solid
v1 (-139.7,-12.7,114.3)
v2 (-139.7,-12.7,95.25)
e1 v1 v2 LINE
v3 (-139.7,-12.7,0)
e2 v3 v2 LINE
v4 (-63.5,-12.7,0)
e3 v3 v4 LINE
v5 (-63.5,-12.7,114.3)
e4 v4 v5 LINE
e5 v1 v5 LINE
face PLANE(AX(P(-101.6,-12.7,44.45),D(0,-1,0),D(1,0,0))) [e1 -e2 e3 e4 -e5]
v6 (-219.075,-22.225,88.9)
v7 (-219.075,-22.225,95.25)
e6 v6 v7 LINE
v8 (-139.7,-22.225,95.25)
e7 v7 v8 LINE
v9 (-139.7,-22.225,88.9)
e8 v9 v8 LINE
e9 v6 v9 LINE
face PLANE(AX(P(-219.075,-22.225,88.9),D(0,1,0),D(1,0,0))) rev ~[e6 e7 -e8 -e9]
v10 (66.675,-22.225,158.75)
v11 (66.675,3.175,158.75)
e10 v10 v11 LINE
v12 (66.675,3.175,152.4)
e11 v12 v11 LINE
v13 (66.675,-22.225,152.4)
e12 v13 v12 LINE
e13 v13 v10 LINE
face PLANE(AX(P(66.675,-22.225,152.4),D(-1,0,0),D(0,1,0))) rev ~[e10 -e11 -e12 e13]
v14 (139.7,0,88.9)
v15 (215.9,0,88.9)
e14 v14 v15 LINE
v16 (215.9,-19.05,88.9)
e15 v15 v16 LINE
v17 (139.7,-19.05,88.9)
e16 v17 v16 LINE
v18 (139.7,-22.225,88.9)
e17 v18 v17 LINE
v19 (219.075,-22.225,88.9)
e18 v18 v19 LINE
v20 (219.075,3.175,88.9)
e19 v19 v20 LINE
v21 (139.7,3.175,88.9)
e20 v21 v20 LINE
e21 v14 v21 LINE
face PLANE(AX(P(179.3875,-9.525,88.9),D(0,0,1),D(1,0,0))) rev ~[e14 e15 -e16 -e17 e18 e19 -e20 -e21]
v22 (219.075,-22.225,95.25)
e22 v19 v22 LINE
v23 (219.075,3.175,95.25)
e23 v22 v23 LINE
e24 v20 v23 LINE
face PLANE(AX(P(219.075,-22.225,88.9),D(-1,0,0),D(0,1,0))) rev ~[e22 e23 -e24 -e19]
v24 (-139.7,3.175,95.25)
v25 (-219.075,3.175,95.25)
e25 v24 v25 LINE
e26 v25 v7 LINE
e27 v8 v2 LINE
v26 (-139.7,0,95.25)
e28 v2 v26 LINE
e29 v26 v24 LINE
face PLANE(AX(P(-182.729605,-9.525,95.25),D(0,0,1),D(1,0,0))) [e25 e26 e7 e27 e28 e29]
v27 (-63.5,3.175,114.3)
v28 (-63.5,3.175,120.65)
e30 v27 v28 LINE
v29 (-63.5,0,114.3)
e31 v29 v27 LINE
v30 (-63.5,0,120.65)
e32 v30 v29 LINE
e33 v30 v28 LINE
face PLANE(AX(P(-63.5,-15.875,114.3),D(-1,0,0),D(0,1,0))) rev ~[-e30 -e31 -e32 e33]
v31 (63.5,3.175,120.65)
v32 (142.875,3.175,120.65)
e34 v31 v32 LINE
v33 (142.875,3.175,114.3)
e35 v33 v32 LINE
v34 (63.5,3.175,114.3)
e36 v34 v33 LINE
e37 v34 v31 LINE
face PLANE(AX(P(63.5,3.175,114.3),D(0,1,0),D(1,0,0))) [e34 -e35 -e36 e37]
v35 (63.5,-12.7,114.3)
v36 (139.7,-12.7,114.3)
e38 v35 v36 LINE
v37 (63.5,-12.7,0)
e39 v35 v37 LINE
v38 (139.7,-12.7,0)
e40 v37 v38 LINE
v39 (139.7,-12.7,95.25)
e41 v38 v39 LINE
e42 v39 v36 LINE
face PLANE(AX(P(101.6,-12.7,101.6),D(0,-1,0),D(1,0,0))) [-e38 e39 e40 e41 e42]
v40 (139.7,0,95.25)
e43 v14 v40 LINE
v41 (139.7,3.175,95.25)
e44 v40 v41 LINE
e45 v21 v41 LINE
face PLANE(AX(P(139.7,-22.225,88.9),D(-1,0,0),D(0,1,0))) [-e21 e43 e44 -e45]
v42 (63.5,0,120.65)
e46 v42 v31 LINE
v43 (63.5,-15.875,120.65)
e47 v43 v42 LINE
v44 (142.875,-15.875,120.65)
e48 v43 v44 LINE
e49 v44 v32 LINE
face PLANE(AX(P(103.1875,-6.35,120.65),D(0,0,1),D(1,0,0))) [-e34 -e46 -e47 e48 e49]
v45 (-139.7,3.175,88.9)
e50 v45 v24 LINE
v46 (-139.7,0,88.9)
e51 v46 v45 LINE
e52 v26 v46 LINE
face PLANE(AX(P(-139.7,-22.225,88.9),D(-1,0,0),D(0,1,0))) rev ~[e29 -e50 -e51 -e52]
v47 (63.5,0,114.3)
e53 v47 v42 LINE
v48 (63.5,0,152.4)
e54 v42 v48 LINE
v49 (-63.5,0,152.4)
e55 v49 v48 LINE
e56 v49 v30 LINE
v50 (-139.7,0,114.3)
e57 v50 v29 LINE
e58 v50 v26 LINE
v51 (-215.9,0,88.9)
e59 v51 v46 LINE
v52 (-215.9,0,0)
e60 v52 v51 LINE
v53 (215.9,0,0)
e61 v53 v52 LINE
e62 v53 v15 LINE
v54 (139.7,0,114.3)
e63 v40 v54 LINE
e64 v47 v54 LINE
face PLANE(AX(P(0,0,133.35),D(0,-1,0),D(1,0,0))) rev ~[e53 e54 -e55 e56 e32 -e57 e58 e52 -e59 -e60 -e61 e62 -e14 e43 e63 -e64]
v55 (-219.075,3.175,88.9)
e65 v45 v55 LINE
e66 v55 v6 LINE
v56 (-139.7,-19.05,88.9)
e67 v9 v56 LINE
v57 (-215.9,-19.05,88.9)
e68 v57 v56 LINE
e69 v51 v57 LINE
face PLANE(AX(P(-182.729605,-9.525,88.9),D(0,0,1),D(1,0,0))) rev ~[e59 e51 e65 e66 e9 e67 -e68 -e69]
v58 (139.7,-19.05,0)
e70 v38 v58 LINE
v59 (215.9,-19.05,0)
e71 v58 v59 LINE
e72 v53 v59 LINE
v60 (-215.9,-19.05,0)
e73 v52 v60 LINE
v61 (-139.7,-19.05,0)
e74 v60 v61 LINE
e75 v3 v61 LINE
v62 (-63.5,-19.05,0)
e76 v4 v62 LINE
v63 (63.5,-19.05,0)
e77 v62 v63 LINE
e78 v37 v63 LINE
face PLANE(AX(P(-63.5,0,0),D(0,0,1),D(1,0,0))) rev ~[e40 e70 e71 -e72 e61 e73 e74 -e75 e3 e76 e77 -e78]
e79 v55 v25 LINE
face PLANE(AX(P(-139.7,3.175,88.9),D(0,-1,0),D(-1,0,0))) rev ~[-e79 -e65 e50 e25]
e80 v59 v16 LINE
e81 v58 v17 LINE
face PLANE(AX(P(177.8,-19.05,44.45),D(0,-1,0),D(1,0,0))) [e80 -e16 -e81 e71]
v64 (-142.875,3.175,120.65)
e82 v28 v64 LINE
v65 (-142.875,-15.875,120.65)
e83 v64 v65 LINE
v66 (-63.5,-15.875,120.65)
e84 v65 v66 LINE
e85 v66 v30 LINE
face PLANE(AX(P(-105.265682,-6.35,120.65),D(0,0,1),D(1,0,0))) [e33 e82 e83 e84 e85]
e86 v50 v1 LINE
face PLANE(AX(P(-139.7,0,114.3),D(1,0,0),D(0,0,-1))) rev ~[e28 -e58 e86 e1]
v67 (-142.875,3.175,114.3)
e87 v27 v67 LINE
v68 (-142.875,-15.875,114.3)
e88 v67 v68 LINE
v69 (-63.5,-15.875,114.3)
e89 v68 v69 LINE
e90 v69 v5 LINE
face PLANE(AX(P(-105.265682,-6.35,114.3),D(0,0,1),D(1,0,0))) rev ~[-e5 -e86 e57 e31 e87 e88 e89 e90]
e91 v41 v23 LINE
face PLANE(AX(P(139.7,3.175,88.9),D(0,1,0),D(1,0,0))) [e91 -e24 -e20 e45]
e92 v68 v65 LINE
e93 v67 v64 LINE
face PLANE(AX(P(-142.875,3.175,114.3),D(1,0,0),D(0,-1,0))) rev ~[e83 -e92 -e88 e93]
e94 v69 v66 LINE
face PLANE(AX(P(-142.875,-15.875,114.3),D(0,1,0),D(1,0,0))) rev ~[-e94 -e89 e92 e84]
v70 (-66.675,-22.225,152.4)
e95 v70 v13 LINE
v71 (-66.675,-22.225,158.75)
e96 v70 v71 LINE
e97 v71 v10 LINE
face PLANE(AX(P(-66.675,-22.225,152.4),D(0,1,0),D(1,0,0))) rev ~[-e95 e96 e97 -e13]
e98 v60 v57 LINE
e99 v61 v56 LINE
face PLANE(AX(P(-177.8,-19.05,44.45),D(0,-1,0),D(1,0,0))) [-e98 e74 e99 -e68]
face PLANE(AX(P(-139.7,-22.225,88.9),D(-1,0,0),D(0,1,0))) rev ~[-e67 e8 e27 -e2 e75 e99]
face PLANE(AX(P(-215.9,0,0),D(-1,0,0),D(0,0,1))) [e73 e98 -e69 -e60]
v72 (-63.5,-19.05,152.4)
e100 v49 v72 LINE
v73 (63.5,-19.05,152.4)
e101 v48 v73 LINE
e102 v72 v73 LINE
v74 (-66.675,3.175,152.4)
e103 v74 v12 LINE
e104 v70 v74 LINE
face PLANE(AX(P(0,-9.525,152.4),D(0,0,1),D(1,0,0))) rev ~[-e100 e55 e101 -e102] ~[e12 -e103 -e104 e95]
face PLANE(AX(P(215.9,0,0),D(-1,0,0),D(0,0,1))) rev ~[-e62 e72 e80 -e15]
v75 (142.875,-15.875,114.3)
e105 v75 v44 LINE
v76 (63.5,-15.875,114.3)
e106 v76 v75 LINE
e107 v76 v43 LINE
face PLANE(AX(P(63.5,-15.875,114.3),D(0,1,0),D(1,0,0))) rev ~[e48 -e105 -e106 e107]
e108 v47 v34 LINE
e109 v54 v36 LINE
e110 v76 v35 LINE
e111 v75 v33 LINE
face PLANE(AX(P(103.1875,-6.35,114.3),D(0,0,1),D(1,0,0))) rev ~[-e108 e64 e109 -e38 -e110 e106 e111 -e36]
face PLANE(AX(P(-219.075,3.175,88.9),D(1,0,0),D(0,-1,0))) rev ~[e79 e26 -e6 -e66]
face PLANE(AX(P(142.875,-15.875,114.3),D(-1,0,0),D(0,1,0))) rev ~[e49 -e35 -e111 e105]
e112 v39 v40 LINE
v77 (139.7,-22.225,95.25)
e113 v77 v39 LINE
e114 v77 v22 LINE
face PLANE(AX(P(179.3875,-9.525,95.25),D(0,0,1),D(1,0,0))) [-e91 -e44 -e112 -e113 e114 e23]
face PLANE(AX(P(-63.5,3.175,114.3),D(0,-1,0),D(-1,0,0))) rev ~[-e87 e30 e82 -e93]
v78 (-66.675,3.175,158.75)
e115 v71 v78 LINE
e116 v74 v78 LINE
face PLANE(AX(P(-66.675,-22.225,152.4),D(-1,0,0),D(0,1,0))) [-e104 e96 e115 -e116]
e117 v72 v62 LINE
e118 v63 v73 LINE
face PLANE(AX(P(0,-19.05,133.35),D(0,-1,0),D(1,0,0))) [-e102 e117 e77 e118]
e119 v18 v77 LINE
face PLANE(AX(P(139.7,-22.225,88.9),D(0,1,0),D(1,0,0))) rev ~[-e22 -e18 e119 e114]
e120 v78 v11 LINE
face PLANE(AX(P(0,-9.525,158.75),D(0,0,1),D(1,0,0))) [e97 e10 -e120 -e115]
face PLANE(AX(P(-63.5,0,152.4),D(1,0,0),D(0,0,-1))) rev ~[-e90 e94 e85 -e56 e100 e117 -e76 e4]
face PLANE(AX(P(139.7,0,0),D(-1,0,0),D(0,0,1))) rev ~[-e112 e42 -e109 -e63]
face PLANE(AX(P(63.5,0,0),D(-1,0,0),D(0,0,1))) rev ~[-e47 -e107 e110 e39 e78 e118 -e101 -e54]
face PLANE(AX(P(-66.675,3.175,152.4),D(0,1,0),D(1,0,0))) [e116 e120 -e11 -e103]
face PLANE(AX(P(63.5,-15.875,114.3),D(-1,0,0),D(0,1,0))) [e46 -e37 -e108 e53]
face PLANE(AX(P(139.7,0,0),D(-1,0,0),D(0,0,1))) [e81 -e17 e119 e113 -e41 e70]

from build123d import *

# Parameters (mm, degrees)
F0_W     = 76.2
F0_H     = 88.9
F1_DEPTH = 19.05
F0_H_2   = 25.4
F2_DEPTH = 12.7
F0_W_2   = 127
F0_H_3   = 38.1
F3_DEPTH = 19.05
F4_W     = 79.375
F4_H     = 25.4
F5_DEPTH = 6.35
F6_W     = 76.2
F6_H     = 12.7
F6_W_2   = 79.375
F6_H_2   = 19.05
F7_DEPTH = 6.35
F8_W     = 133.35
F8_H     = 25.4
F8_W_2   = 127
F8_H_2   = 19.05
F9_DEPTH = 6.35


with BuildPart() as f1:
    # F0 (on Front) → F1 (new body)
    with BuildSketch(Plane.XZ):
        with Locations((-177.8, 44.45)):
            Rectangle(F0_W, F0_H)
    extrude(amount=F1_DEPTH)

    # F0 (on Front) → F2 (join)
    with BuildSketch(Plane.XZ):
        with Locations((-101.6, 44.45)):
            Rectangle(F0_W, F0_H)
        with Locations((-101.6, 101.6)):
            Rectangle(F0_W, F0_H_2)
    extrude(amount=F2_DEPTH)



with BuildPart() as f1b:
    # F0 (on Front) → F1, piece 2 (new body)
    with BuildSketch(Plane.XZ):
        with Locations((177.8, 44.45)):
            Rectangle(F0_W, F0_H)
    extrude(amount=F1_DEPTH)

    # F0 (on Front) → F2, piece 2 (join)
    with BuildSketch(Plane.XZ):
        with Locations((101.6, 101.6)):
            Rectangle(F0_W, F0_H_2)
        with Locations((101.6, 44.45)):
            Rectangle(F0_W, F0_H)
    extrude(amount=F2_DEPTH)


with BuildPart() as f1_1:
    add(f1.part)

    add(f1b.part)  # F3 merges F1b
    # F0 (on Front) → F3 (join)
    with BuildSketch(Plane.XZ):
        with Locations((0, 133.35)):
            Rectangle(F0_W_2, F0_H_3)
        with Locations((0, 101.6)):
            Rectangle(F0_W_2, F0_H_2)
        with Locations((0, 44.45)):
            Rectangle(F0_W_2, F0_H)
    extrude(amount=F3_DEPTH)

    # F4 (on face) → F5 (join)
    with BuildSketch(Plane.XY.offset(88.9)):
        Polygon((-139.7, 3.175), (-219.075, 3.175), (-219.075, -22.225), (-139.7, -22.225), (-139.7, -19.05), (-215.9, -19.05), (-215.9, 0), (-139.7, 0), align=None)
        Polygon((-139.7, -12.7), (-139.7, 0), (-215.9, 0), (-215.9, -19.05), (-139.7, -19.05), align=None)
        with Locations((179.3875, -9.525)):
            Rectangle(F4_W, F4_H)
    extrude(amount=F5_DEPTH)

    # F6 (on face) → F7 (join)
    with BuildSketch(Plane.XY.offset(114.3)):
        Polygon((-63.5, 3.175), (-142.875, 3.175), (-142.875, -15.875), (-63.5, -15.875), (-63.5, -12.7), (-139.7, -12.7), (-139.7, 0), (-63.5, 0), align=None)
        with Locations((-101.6, -6.35)):
            Rectangle(F6_W, F6_H)
        with Locations((103.1875, -6.35)):
            Rectangle(F6_W_2, F6_H_2)
    extrude(amount=F7_DEPTH)

    # F8 (on face) → F9 (join)
    with BuildSketch(Plane.XY.offset(152.4)):
        with Locations((0, -9.525)):
            Rectangle(F8_W, F8_H)
        with Locations((0, -9.525)):
            Rectangle(F8_W_2, F8_H_2, mode=Mode.SUBTRACT)
        with Locations((0, -9.525)):
            Rectangle(F8_W_2, F8_H_2)
    extrude(amount=F9_DEPTH)


solid = f1_1.part
